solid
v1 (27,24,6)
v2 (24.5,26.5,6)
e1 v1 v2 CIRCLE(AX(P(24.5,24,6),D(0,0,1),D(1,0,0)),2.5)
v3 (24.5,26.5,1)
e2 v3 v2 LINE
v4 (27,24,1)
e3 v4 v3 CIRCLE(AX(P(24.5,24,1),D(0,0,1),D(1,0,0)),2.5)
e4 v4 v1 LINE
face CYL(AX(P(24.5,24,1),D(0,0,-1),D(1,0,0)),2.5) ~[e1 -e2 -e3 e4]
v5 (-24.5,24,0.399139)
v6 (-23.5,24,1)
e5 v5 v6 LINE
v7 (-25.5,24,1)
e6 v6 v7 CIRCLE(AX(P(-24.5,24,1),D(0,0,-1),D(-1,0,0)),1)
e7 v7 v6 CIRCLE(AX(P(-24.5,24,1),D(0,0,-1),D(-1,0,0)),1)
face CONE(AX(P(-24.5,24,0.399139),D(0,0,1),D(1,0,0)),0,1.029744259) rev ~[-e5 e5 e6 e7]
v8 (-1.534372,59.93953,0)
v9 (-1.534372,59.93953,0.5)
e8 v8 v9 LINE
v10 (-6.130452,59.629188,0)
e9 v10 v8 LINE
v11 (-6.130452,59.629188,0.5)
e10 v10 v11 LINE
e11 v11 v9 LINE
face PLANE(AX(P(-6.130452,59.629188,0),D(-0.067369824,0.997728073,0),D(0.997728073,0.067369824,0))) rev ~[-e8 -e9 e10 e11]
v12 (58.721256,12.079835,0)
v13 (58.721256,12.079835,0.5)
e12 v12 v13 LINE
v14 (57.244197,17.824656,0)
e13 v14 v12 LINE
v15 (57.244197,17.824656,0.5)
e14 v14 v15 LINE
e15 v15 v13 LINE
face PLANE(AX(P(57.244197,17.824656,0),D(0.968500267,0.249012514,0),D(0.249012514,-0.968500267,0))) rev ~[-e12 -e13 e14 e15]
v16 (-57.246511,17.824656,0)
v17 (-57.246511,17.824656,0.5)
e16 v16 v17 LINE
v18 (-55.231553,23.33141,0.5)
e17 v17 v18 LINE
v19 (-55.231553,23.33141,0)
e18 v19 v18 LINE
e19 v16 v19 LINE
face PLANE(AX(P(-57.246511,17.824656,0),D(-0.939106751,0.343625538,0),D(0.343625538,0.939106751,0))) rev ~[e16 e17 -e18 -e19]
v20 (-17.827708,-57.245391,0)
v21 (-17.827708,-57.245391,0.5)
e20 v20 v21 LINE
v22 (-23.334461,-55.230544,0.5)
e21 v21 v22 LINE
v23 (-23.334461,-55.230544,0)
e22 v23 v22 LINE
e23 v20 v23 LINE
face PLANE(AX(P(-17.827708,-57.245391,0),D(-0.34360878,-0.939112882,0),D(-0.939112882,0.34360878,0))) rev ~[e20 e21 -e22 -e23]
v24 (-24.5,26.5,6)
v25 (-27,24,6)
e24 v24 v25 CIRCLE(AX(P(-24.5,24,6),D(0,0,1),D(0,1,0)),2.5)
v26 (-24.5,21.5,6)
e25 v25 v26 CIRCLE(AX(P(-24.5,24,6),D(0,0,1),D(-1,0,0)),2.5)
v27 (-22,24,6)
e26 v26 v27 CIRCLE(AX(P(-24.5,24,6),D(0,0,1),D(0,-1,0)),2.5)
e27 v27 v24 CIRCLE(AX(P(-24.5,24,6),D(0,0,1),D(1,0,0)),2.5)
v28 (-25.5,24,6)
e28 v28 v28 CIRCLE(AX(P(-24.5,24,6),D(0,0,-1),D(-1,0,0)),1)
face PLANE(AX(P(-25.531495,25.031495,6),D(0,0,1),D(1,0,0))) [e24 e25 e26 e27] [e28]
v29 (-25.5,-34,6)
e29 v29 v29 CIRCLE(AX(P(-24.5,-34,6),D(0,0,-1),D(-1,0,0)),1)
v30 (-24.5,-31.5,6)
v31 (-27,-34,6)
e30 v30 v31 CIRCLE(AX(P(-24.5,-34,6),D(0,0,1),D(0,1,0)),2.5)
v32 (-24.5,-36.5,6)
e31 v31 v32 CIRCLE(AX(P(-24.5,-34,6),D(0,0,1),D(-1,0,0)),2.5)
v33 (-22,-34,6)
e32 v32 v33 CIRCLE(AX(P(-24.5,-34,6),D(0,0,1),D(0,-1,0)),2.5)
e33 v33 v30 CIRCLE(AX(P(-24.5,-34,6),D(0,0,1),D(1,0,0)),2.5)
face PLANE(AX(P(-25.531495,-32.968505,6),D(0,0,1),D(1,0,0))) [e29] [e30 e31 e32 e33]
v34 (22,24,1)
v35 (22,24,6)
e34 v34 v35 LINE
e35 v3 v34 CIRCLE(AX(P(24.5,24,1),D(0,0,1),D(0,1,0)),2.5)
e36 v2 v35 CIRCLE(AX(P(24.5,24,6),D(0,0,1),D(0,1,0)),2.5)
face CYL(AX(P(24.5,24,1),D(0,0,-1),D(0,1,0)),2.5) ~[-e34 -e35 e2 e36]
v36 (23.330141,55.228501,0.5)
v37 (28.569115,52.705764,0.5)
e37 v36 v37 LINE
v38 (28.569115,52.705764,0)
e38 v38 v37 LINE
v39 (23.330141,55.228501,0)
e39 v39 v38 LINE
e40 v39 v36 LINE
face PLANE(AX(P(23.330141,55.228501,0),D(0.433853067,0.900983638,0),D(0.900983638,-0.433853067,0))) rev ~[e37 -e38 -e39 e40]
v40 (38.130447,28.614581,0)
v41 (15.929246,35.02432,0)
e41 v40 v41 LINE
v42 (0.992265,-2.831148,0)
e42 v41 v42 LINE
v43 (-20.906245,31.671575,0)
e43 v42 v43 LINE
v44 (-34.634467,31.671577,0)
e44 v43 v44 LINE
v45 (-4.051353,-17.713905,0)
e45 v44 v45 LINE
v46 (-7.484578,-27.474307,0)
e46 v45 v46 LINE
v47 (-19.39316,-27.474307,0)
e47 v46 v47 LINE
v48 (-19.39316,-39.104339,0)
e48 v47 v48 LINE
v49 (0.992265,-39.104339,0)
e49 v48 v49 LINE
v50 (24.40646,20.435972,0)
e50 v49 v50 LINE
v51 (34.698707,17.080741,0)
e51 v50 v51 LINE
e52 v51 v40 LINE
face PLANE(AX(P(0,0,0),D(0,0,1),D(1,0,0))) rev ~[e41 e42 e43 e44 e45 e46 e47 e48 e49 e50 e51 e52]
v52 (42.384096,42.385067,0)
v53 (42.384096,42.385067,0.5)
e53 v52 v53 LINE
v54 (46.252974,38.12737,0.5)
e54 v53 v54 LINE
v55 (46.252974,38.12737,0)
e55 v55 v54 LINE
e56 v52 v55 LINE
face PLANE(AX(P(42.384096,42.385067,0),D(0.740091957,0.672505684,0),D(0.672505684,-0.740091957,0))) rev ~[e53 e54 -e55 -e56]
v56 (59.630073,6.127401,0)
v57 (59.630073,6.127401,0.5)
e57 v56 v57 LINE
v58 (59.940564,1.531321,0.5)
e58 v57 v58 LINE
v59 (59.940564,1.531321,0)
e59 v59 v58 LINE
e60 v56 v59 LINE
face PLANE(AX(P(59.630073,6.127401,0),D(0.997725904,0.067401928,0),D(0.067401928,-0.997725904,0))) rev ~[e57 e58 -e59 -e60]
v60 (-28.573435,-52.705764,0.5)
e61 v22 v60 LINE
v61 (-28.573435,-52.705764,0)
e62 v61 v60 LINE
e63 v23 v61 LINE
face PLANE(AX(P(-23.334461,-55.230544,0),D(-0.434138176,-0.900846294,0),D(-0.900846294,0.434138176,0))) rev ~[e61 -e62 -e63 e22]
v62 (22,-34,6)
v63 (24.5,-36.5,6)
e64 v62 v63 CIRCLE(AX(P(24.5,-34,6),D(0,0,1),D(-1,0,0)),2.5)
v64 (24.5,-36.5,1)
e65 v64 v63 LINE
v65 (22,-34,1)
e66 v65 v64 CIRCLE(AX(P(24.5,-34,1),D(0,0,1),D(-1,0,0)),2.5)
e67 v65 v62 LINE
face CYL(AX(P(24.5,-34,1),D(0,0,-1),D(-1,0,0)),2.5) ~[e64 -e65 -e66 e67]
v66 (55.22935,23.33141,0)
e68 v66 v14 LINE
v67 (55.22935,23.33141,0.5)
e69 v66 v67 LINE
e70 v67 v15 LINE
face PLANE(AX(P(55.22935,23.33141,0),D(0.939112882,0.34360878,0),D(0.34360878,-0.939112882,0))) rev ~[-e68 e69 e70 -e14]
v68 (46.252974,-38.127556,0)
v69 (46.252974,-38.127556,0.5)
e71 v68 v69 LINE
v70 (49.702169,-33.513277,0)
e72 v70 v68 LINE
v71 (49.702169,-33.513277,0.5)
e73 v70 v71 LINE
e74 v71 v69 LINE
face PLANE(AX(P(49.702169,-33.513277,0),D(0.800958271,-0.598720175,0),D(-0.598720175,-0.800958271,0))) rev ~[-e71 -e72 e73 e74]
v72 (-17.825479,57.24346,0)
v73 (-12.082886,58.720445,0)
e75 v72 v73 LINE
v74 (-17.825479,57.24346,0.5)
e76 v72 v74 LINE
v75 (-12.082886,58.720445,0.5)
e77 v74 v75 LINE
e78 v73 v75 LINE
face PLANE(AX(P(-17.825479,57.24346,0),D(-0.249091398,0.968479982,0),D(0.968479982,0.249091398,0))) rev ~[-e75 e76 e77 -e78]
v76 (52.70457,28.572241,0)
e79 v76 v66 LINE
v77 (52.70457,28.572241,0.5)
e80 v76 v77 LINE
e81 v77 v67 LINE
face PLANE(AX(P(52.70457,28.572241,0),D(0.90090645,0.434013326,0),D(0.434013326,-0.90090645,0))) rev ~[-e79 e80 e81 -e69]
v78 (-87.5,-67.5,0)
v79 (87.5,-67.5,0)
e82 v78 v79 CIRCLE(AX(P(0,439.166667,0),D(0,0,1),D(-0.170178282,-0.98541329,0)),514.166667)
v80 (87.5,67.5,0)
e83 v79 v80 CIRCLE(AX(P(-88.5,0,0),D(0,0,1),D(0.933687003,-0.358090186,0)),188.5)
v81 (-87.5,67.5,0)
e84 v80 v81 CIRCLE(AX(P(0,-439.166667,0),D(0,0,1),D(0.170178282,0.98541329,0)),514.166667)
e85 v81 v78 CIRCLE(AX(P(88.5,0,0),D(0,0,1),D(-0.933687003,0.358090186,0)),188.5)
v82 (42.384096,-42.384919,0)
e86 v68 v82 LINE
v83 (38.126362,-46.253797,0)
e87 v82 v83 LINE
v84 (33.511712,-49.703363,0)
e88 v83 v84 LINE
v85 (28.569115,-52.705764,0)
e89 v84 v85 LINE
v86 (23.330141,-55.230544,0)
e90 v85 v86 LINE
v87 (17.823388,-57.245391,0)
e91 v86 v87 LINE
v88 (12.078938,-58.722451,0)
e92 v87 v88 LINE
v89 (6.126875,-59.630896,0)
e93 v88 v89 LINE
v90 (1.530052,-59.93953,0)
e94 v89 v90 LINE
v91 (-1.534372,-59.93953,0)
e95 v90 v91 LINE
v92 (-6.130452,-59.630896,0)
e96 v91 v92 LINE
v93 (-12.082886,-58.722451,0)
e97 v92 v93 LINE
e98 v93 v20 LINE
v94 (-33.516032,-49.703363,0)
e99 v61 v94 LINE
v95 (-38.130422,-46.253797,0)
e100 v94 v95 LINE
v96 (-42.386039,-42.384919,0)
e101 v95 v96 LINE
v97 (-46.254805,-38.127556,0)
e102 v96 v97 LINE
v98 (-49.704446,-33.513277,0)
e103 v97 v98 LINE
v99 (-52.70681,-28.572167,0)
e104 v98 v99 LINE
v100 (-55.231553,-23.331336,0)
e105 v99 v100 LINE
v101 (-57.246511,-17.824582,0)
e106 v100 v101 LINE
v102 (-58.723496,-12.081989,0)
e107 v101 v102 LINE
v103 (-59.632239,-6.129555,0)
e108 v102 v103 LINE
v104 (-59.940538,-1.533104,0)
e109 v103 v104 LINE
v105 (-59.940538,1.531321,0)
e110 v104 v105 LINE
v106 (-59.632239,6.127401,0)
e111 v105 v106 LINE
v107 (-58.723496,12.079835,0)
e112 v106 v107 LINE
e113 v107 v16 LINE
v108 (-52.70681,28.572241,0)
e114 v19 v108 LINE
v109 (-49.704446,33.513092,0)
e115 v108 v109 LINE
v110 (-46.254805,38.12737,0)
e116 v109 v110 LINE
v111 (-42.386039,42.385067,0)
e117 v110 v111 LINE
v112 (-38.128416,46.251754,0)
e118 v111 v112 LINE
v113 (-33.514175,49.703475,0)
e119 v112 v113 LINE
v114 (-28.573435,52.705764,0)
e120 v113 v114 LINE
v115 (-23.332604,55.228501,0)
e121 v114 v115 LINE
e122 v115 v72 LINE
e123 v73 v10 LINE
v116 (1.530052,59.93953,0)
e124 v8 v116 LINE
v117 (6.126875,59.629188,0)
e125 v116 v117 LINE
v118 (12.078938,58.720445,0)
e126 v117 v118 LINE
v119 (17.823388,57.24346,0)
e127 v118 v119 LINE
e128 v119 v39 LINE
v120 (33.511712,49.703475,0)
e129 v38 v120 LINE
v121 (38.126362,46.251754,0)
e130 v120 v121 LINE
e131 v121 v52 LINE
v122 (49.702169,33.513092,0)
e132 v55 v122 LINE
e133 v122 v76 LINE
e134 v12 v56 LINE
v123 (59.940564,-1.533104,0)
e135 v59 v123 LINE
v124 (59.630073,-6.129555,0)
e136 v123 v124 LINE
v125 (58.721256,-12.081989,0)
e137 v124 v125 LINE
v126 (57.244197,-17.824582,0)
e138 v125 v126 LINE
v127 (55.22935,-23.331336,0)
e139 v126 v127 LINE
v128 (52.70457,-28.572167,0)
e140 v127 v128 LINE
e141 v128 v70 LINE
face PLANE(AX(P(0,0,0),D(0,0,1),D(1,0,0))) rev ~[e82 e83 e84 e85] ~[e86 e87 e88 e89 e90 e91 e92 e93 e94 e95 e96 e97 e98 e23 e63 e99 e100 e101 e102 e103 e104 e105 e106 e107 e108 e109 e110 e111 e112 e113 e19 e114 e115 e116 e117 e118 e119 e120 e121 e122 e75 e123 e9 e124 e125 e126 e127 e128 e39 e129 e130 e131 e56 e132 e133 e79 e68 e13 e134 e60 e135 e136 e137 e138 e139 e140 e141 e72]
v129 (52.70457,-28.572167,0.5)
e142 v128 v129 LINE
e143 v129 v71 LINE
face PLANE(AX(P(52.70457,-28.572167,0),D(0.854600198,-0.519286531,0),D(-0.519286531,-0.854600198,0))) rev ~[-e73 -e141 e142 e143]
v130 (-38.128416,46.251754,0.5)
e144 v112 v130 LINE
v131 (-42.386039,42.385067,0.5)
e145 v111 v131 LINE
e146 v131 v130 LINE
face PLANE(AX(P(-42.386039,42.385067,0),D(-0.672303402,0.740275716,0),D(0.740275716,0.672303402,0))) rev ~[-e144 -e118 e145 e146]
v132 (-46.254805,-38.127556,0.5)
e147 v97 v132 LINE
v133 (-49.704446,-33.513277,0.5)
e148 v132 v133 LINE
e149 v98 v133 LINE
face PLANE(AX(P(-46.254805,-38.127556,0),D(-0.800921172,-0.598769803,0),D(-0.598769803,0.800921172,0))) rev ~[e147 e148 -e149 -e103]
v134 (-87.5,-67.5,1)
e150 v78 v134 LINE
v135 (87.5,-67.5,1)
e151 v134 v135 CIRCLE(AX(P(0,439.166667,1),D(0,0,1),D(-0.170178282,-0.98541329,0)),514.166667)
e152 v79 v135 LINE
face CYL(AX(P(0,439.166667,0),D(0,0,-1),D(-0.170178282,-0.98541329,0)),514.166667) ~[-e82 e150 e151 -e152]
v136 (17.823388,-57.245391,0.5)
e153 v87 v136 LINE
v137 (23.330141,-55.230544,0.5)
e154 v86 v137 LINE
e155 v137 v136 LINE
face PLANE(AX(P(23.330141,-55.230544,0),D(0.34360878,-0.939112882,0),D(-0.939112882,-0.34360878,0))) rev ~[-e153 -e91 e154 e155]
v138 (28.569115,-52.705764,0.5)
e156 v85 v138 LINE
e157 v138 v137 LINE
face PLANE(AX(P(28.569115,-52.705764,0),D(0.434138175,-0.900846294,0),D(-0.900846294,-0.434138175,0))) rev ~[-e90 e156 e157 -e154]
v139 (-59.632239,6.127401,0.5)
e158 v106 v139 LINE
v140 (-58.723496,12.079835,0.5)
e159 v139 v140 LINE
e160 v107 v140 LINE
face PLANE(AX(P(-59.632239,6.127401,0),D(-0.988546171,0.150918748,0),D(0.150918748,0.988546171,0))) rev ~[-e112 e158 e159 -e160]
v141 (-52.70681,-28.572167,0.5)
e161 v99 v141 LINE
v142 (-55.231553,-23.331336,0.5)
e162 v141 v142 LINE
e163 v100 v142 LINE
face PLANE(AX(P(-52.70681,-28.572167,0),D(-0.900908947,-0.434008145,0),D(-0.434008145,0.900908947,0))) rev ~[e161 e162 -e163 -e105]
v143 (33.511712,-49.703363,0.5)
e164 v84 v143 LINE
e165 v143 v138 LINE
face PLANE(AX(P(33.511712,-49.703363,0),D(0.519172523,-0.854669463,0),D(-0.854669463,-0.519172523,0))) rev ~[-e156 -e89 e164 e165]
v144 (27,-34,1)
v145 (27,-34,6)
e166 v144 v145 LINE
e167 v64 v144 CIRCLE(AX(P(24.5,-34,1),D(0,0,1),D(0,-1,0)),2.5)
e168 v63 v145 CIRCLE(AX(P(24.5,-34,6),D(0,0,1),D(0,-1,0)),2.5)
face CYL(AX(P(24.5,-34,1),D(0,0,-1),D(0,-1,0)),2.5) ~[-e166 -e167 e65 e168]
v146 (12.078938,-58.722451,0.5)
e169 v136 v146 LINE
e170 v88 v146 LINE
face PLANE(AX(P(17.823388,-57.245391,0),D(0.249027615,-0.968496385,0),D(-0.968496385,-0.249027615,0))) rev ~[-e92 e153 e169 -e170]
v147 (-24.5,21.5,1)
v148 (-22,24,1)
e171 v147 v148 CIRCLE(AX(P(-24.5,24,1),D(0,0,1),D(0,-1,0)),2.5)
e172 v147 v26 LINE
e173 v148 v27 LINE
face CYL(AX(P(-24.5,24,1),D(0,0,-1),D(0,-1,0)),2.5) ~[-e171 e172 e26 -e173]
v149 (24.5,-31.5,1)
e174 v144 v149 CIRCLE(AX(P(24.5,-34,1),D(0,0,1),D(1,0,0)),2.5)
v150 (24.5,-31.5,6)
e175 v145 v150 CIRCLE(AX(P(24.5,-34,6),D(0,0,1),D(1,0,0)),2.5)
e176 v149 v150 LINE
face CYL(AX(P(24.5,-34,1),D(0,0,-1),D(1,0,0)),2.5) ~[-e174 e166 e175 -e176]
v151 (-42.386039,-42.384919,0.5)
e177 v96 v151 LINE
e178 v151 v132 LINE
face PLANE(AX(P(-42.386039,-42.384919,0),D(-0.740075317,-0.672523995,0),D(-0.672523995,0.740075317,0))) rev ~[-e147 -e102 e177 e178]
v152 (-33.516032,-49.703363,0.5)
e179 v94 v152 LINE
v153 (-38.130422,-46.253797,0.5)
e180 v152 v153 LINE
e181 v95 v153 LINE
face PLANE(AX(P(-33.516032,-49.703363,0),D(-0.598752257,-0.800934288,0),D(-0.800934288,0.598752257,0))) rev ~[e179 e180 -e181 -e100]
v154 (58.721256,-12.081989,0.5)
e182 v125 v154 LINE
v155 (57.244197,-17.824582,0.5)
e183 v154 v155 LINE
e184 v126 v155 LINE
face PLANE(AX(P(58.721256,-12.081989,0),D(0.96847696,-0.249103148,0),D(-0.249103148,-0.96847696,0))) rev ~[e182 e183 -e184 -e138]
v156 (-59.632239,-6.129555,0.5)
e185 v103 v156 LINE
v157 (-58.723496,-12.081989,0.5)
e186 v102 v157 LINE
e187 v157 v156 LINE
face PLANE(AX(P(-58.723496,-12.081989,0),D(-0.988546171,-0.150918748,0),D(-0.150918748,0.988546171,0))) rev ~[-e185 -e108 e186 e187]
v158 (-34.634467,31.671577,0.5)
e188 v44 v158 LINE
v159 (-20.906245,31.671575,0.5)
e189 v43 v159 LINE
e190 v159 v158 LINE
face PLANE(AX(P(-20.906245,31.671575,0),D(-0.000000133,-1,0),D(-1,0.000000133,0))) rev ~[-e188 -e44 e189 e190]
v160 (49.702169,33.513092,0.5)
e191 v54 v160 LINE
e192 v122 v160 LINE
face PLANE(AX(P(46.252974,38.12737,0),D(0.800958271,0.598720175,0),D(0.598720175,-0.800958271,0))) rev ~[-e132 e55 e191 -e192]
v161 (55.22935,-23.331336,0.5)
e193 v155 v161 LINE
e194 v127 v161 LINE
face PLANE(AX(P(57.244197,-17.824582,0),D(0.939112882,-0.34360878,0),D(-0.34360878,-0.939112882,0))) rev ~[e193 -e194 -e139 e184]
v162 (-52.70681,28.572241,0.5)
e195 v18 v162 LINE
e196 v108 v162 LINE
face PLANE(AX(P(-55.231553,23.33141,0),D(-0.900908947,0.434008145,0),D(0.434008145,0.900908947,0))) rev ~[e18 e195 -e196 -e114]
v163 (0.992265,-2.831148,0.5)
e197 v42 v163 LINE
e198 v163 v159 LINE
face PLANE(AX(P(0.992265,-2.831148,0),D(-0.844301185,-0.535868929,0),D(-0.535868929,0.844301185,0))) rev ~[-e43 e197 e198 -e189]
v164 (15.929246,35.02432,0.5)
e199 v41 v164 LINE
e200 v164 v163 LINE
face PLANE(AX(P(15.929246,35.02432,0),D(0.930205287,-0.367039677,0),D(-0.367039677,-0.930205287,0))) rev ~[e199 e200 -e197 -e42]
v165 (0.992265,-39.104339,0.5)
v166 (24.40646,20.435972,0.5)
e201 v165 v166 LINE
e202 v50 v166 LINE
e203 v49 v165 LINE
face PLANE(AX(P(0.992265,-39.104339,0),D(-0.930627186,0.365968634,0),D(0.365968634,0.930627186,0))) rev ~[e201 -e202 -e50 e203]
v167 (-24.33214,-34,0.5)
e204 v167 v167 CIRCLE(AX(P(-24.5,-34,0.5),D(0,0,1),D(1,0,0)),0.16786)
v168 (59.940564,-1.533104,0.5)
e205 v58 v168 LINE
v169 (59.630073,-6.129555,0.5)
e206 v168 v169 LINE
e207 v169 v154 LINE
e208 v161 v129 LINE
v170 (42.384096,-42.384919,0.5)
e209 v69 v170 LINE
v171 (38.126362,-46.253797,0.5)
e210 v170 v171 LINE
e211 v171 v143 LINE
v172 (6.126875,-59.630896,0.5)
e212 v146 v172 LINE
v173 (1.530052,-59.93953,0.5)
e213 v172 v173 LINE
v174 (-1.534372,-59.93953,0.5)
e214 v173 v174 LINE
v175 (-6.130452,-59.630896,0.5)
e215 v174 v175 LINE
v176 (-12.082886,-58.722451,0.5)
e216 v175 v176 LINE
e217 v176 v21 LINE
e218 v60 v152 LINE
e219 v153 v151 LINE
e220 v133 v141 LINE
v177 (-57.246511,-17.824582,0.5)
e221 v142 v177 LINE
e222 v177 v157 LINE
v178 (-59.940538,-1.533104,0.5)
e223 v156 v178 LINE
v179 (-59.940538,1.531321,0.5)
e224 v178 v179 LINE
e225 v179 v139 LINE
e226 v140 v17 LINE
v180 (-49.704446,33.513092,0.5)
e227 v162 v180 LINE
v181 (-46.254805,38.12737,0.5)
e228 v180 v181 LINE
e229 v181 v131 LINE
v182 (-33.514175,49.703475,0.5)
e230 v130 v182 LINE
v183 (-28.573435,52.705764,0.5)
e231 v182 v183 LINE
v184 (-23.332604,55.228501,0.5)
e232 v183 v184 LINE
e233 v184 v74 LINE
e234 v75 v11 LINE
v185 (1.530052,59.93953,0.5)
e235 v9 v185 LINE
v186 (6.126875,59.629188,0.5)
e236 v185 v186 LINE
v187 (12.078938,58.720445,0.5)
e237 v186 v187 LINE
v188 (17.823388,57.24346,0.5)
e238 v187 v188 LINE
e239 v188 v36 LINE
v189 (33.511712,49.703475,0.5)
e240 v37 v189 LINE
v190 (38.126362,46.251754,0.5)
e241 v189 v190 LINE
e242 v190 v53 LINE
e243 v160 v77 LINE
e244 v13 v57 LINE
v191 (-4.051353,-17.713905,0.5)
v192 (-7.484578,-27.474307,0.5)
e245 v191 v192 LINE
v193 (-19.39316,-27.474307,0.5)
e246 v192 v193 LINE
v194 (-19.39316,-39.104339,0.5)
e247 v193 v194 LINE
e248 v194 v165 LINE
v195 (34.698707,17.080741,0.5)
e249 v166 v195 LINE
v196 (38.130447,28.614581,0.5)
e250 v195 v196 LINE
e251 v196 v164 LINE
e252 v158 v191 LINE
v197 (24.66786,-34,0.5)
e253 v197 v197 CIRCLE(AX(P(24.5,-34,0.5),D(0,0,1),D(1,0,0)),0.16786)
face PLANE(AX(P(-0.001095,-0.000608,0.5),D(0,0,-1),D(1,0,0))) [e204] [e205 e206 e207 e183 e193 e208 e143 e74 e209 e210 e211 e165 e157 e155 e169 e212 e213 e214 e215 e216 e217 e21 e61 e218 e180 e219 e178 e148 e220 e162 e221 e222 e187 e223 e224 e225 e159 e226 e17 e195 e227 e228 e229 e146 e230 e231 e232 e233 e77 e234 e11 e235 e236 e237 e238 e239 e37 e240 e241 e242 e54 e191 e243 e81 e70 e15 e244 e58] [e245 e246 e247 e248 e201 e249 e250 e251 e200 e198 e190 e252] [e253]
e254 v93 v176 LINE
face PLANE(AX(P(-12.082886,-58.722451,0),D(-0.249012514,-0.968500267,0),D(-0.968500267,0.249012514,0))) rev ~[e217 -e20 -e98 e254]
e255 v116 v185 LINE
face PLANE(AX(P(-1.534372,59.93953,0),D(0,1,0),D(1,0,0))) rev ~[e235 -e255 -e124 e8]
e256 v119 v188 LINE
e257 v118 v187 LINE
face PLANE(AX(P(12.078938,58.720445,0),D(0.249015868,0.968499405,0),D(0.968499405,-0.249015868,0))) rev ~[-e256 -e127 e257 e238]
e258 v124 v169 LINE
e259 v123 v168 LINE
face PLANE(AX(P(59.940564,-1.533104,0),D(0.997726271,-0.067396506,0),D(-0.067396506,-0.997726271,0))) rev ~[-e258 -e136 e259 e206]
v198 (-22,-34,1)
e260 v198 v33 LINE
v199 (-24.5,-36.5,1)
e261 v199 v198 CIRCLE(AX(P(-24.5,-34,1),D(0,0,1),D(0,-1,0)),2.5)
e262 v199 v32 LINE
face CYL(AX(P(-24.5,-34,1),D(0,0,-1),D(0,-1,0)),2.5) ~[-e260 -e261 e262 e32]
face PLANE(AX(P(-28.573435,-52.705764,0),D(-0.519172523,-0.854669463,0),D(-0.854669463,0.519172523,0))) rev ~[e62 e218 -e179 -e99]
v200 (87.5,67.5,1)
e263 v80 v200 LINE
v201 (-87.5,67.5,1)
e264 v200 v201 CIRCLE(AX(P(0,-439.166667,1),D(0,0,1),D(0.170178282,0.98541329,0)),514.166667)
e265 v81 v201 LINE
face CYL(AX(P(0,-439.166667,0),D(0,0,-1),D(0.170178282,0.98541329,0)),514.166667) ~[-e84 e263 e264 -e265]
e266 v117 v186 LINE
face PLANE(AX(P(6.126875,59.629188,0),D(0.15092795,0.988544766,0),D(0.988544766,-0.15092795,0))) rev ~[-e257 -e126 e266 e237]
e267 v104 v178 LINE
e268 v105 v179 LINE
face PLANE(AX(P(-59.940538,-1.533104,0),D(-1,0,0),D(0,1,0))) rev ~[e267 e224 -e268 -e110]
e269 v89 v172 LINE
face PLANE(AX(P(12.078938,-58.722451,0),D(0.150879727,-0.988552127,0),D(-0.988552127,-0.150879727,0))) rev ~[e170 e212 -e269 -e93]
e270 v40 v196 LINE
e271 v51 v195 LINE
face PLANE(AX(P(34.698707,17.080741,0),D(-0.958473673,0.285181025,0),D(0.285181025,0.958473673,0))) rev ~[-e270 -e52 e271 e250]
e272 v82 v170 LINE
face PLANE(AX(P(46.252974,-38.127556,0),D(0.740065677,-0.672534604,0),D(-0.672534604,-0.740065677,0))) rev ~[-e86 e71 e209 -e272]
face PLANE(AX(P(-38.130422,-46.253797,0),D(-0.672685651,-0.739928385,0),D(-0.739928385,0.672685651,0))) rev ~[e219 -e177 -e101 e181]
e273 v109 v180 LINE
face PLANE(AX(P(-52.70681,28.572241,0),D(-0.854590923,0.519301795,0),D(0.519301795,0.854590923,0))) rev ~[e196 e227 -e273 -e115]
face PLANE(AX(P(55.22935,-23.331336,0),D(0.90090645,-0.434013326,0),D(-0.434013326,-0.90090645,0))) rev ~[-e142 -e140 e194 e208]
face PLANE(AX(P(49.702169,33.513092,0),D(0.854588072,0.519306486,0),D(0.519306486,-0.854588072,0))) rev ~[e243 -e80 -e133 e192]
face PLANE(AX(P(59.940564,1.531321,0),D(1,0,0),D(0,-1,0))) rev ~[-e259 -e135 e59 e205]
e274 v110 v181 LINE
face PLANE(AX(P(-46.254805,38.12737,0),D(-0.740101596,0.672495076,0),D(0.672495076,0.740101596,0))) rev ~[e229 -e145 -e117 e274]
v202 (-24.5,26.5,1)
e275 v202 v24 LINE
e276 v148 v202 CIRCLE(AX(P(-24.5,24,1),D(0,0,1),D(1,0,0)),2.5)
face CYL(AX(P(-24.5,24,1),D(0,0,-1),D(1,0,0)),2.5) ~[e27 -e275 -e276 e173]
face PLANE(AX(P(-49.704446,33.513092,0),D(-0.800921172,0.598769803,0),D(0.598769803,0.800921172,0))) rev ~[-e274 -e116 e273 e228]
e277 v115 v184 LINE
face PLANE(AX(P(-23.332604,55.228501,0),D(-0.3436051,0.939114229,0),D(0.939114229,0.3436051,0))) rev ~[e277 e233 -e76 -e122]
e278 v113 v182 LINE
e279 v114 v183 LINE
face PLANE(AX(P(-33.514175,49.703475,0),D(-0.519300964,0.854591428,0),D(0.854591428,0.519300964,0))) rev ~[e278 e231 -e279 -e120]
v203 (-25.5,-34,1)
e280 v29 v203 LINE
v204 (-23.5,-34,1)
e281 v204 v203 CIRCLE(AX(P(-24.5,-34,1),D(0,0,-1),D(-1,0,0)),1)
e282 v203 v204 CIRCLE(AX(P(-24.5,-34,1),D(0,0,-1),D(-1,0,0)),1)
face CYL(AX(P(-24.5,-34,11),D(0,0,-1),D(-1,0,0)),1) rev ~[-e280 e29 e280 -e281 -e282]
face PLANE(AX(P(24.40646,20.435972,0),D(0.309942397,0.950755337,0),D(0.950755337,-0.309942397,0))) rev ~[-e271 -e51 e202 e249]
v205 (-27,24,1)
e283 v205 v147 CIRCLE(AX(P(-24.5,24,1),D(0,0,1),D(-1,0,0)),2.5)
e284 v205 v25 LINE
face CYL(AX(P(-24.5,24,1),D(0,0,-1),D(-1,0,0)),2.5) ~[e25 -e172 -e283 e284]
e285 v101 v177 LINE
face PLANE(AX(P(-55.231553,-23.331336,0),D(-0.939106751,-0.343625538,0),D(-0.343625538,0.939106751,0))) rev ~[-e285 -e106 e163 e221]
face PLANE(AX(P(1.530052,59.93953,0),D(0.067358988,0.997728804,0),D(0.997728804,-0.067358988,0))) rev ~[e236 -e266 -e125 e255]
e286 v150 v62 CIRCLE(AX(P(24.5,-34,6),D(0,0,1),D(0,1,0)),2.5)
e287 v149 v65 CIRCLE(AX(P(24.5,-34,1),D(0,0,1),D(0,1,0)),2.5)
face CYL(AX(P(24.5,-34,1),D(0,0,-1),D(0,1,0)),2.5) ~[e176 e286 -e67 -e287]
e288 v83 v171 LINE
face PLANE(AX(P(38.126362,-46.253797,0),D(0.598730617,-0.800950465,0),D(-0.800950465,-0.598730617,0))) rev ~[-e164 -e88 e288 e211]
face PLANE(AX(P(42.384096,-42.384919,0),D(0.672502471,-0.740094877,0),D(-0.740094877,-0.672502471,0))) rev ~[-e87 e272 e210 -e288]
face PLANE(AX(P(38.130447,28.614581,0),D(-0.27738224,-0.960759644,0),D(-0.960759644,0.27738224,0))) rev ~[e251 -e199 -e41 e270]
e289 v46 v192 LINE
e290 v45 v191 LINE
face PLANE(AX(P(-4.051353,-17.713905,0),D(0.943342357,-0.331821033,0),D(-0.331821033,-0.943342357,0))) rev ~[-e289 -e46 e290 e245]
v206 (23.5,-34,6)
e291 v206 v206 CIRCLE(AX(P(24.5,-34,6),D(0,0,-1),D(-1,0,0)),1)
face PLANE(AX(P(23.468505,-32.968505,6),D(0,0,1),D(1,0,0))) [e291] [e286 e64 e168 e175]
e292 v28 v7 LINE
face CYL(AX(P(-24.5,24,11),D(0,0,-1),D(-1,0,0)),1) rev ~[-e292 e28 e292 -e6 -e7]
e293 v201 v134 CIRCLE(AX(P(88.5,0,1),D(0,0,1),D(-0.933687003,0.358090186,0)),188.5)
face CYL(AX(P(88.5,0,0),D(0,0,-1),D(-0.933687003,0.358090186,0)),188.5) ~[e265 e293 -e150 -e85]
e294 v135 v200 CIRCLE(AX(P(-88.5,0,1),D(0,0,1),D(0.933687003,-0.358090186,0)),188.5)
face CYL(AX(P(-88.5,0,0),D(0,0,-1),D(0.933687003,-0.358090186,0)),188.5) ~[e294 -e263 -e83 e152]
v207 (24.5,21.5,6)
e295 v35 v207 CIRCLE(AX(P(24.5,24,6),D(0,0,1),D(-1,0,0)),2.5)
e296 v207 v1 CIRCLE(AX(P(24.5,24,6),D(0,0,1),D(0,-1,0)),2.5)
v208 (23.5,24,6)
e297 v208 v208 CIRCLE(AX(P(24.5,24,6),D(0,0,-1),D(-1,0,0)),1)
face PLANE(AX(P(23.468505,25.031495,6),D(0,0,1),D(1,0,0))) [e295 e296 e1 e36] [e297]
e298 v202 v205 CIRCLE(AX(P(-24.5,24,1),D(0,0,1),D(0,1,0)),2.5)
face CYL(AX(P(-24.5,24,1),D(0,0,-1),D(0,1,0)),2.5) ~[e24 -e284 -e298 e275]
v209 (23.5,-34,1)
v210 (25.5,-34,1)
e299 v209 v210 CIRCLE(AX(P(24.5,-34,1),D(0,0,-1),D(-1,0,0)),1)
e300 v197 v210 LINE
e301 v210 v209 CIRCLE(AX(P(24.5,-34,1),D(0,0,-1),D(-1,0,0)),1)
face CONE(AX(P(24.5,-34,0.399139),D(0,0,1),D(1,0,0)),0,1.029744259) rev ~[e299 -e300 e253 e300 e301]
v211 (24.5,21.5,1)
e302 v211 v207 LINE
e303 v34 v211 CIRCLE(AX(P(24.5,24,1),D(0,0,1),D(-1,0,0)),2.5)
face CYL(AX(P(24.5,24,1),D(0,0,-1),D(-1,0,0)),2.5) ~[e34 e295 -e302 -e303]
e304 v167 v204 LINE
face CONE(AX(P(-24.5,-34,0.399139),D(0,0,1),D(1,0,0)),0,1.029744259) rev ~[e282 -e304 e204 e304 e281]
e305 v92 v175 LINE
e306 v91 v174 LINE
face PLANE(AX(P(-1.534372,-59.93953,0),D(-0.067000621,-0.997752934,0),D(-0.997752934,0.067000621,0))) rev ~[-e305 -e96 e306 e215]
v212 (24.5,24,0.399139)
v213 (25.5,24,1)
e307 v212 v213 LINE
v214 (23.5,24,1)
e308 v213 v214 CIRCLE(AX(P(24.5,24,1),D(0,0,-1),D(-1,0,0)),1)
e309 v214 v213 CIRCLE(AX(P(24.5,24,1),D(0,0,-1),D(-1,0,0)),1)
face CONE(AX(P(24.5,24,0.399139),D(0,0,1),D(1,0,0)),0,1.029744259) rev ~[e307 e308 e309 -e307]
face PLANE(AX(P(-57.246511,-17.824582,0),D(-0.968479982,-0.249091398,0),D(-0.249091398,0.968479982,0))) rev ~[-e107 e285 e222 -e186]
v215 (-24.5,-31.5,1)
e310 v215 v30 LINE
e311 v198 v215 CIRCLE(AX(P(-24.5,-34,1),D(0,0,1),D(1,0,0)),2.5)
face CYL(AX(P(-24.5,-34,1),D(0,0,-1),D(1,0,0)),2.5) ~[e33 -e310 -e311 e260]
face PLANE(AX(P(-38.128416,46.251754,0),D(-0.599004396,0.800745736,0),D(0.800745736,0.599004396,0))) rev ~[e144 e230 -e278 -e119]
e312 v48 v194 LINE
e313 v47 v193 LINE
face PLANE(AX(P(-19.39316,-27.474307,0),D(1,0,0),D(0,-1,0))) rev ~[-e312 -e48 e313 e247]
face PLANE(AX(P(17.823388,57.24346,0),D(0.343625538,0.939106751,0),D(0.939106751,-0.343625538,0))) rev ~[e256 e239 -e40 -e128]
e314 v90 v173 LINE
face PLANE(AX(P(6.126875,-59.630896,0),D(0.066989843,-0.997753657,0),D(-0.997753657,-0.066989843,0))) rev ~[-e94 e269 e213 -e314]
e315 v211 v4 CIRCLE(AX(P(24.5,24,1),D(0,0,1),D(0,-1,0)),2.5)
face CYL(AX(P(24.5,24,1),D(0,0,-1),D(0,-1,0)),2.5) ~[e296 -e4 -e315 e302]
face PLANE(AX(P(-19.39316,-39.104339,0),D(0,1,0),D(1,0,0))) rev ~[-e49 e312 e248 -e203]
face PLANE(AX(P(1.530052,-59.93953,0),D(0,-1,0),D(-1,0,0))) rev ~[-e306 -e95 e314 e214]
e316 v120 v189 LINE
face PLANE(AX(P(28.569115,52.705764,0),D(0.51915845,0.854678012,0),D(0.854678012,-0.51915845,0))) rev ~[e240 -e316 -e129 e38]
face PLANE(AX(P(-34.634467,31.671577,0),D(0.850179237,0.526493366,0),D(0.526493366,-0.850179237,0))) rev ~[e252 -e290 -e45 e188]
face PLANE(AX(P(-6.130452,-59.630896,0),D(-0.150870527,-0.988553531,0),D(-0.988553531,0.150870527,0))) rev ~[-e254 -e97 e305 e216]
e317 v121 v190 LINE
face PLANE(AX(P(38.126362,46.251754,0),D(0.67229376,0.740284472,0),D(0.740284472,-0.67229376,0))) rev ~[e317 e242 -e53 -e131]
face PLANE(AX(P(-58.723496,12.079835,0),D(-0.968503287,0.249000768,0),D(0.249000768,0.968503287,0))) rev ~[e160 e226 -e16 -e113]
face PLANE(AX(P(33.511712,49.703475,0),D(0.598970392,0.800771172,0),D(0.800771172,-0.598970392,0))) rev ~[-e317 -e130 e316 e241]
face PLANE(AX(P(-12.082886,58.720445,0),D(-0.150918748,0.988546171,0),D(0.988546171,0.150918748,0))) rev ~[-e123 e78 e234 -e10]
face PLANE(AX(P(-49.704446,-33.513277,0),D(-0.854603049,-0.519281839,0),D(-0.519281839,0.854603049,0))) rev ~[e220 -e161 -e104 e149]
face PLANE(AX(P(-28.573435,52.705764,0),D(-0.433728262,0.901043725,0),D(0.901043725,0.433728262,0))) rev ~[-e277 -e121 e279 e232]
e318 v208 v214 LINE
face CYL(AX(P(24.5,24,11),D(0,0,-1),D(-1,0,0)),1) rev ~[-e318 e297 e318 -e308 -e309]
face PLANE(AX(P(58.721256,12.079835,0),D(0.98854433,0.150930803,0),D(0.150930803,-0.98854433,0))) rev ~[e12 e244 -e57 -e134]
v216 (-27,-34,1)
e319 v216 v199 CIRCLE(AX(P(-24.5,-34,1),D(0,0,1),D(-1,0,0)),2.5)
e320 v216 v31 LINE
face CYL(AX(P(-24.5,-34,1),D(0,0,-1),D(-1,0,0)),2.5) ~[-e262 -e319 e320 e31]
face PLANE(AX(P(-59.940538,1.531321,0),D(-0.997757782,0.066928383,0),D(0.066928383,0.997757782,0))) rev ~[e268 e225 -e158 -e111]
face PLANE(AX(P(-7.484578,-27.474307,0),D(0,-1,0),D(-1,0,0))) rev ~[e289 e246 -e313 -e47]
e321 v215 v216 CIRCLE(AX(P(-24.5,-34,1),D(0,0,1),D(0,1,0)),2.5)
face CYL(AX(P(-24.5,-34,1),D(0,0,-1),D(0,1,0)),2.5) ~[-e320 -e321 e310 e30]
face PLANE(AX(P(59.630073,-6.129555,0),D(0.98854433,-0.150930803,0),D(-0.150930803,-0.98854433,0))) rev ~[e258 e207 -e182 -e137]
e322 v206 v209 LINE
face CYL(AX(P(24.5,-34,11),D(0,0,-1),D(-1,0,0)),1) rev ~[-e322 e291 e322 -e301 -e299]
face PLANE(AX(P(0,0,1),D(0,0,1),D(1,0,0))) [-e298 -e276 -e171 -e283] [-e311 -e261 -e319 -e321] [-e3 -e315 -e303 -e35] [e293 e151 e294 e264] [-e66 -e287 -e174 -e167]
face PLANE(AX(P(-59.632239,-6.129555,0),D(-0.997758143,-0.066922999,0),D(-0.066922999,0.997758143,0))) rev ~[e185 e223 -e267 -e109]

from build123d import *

# Parameters (mm, degrees)
F1_DEPTH        = 1
F3_DEPTH        = 0.5
F5_DEPTH        = 5
F10_D           = 2
F10_DEPTH       = 5
F10_TIP         = 0.600860619
F10_ON_F7_D     = 2
F10_ON_F7_DEPTH = 5
F10_ON_F7_TIP   = 0.600860619
F10_ON_F8_D     = 2
F10_ON_F8_DEPTH = 5
F10_ON_F8_TIP   = 0.600860619
F10_ON_F9_D     = 2
F10_ON_F9_DEPTH = 5
F10_ON_F9_TIP   = 0.600860619


# Not quite as in the source:
# - ends of sketch curves that miss each other by under 0.0002 mm in the source are joined


with BuildPart() as f1:
    # F0 (on Top) → F1 (new body)
    with BuildSketch(Plane.XY):
        with BuildLine():
            ThreePointArc((87.5, -67.5), (100, 0), (87.5, 67.5))
            ThreePointArc((87.5, 67.5), (0, 75), (-87.5, 67.5))
            ThreePointArc((-87.5, 67.5), (-100, 0), (-87.5, -67.5))
            ThreePointArc((-87.5, -67.5), (0, -75), (87.5, -67.5))
        make_face()
    extrude(amount=F1_DEPTH)

    # F2 (on face) → F3 (cut)
    with BuildSketch(Plane(origin=(0, 0, 0), x_dir=(1, 0, 0), z_dir=(0, 0, -1))):
        Polygon((59.9405638027, -1.5313209672), (59.9405638027, -3.714e-05), (59.9405638027, 1.5331036891), (59.6300730728, 6.1295549733), (58.7212563071, 12.0819890983), (57.2441969375, 17.8245820004), (55.2293497966, 23.3313356518), (52.7045699138, 28.5721666207), (49.7021691234, 33.5132774711), (46.2529736583, 38.1275559743), (42.3840957472, 42.3849186981), (38.126361623, 46.2537966092), (33.5117117195, 49.7033634747), (28.5691152675, 52.705764265), (23.3301413005, 55.2305441479), (17.8233876491, 57.2453912888), (12.078937745, 58.7224506584), (6.1268750204, 59.6308960237), (1.5300523358, 59.9395297516), (-0.0008600909, 59.9395297516), (-1.5343723204, 59.9395297516), (-6.1304522042, 59.6308960237), (-12.0828863293, 58.7224506584), (-17.8277076337, 57.2453912888), (-23.3344612852, 55.2305441479), (-28.5734352521, 52.705764265), (-33.5160317041, 49.7033634747), (-38.1304216273, 46.2537966092), (-42.3860387693, 42.3849186981), (-46.2548052603, 38.1275559743), (-49.7044464059, 33.5132774711), (-52.7068100562, 28.5721666207), (-55.2315527989, 23.3313356518), (-57.24651136, 17.8245820004), (-58.7234964495, 12.0819890983), (-59.6322389351, 6.1295549733), (-59.9405384027, 1.5331036891), (-59.9405384027, -3.714e-05), (-59.9405384027, -1.5313209672), (-59.6322389351, -6.127400851), (-58.7234964495, -12.079834976), (-57.24651136, -17.8246562804), (-55.2315527989, -23.3314099319), (-52.7068100562, -28.5722409008), (-49.7044464059, -33.5130917709), (-46.2548052603, -38.1273702741), (-42.3860387693, -42.3850672583), (-38.1284160652, -46.251753907), (-33.5141747021, -49.7034748948), (-28.5734352521, -52.705764265), (-23.3326042832, -55.2285014457), (-17.8254792313, -57.2434600068), (-12.0828863293, -58.7204450962), (-6.1304522042, -59.6291875818), (-1.5343723204, -59.9395297516), (-0.0008600909, -59.9395297516), (1.5300523358, -59.9395297516), (6.1268750204, -59.6291875818), (12.078937745, -58.7204450962), (17.8233876491, -57.2434600068), (23.3301413005, -55.2285014457), (28.5691152675, -52.705764265), (33.5117117195, -49.7034748948), (38.126361623, -46.251753907), (42.3840957472, -42.3850672583), (46.2529736583, -38.1273702741), (49.7021691234, -33.5130917709), (52.7045699138, -28.5722409008), (55.2293497966, -23.3314099319), (57.2441969375, -17.8246562804), (58.7212563071, -12.079834976), (59.6300730728, -6.127400851), align=None)
        Polygon((38.1304470273, -28.6145805458), (15.9292456364, -35.0243199768), (0.9922645644, 2.8311480684), (-20.9062448628, -31.6715753619), (-34.6344668525, -31.6715771942), (-4.051352795, 17.7139046828), (-7.4845780431, 27.4743070541), (-19.3931602971, 27.4743070541), (-19.3931602971, 39.1043390122), (0.9922645644, 39.1043390122), (24.4064596442, -20.4359724552), (34.6987073808, -17.08074129), align=None, mode=Mode.SUBTRACT)
    extrude(amount=-F3_DEPTH, mode=Mode.SUBTRACT)

    # F4 (on face) → F5 (join)
    with BuildSketch(Plane.XY.offset(1)):
        with BuildLine():
            ThreePointArc((-24.5, -31.5), (-26.267766953, -32.232233047), (-27, -34))
            Line((-27, -34), (-24.5, -34))
            Line((-24.5, -34), (-24.5, -31.5))
        make_face()
        with BuildLine():
            Line((-24.5, -31.5), (-24.5, -34))
            Line((-24.5, -34), (-22, -34))
            ThreePointArc((-22, -34), (-22.732233047, -32.232233047), (-24.5, -31.5))
        make_face()
        with BuildLine():
            Line((-22, -34), (-24.5, -34))
            Line((-24.5, -34), (-24.5, -36.5))
            ThreePointArc((-24.5, -36.5), (-22.732233047, -35.767766953), (-22, -34))
        make_face()
        with BuildLine():
            Line((-24.5, -34), (-27, -34))
            ThreePointArc((-27, -34), (-26.267766953, -35.767766953), (-24.5, -36.5))
            Line((-24.5, -36.5), (-24.5, -34))
        make_face()
        with BuildLine():
            Line((-24.5, 24), (-24.5, 26.5))
            ThreePointArc((-24.5, 26.5), (-26.267766953, 25.767766953), (-27, 24))
            Line((-27, 24), (-24.5, 24))
        make_face()
        with BuildLine():
            Line((-24.5, 24), (-27, 24))
            ThreePointArc((-27, 24), (-26.267766953, 22.232233047), (-24.5, 21.5))
            Line((-24.5, 21.5), (-24.5, 24))
        make_face()
        with BuildLine():
            ThreePointArc((-22, 24), (-22.732233047, 25.767766953), (-24.5, 26.5))
            Line((-24.5, 26.5), (-24.5, 24))
            Line((-24.5, 24), (-22, 24))
        make_face()
        with BuildLine():
            Line((-22, 24), (-24.5, 24))
            Line((-24.5, 24), (-24.5, 21.5))
            ThreePointArc((-24.5, 21.5), (-22.732233047, 22.232233047), (-22, 24))
        make_face()
        with BuildLine():
            Line((24.5, -34), (24.5, -31.5))
            ThreePointArc((24.5, -31.5), (22.732233047, -32.232233047), (22, -34))
            Line((22, -34), (24.5, -34))
        make_face()
        with BuildLine():
            ThreePointArc((22, -34), (22.732233047, -35.767766953), (24.5, -36.5))
            Line((24.5, -36.5), (24.5, -34))
            Line((24.5, -34), (22, -34))
        make_face()
        with BuildLine():
            Line((24.5, -34), (27, -34))
            ThreePointArc((27, -34), (26.267766953, -32.232233047), (24.5, -31.5))
            Line((24.5, -31.5), (24.5, -34))
        make_face()
        with BuildLine():
            ThreePointArc((24.5, -36.5), (26.267766953, -35.767766953), (27, -34))
            Line((27, -34), (24.5, -34))
            Line((24.5, -34), (24.5, -36.5))
        make_face()
        with BuildLine():
            Line((24.5, 24), (24.5, 26.5))
            ThreePointArc((24.5, 26.5), (22.732233047, 25.767766953), (22, 24))
            Line((22, 24), (24.5, 24))
        make_face()
        with BuildLine():
            ThreePointArc((27, 24), (26.267766953, 25.767766953), (24.5, 26.5))
            Line((24.5, 26.5), (24.5, 24))
            Line((24.5, 24), (27, 24))
        make_face()
        with BuildLine():
            Line((27, 24), (24.5, 24))
            Line((24.5, 24), (24.5, 21.5))
            ThreePointArc((24.5, 21.5), (26.267766953, 22.232233047), (27, 24))
        make_face()
        with BuildLine():
            Line((24.5, 21.5), (24.5, 24))
            Line((24.5, 24), (22, 24))
            ThreePointArc((22, 24), (22.732233047, 22.232233047), (24.5, 21.5))
        make_face()
    extrude(amount=F5_DEPTH)

    # F10
    with Locations(Plane.XY.offset(6)):
        with Locations((-24.5, 24)):
            Hole(F10_D / 2, depth=F10_DEPTH)
            with Locations((0, 0, -(F10_DEPTH + F10_TIP / 2))):  # 118° drill point
                Cone(0, F10_D / 2, F10_TIP, mode=Mode.SUBTRACT)

    # F10 on F7
    with Locations(Plane.XY.offset(6)):
        with Locations((24.5, 24)):
            Hole(F10_ON_F7_D / 2, depth=F10_ON_F7_DEPTH)
            with Locations((0, 0, -(F10_ON_F7_DEPTH + F10_ON_F7_TIP / 2))):  # 118° drill point
                Cone(0, F10_ON_F7_D / 2, F10_ON_F7_TIP, mode=Mode.SUBTRACT)

    # F10 on F8
    with Locations(Plane.XY.offset(6)):
        with Locations((-24.5, -34)):
            Hole(F10_ON_F8_D / 2, depth=F10_ON_F8_DEPTH)
            with Locations((0, 0, -(F10_ON_F8_DEPTH + F10_ON_F8_TIP / 2))):  # 118° drill point
                Cone(0, F10_ON_F8_D / 2, F10_ON_F8_TIP, mode=Mode.SUBTRACT)

    # F10 on F9
    with Locations(Plane.XY.offset(6)):
        with Locations((24.5, -34)):
            Hole(F10_ON_F9_D / 2, depth=F10_ON_F9_DEPTH)
            with Locations((0, 0, -(F10_ON_F9_DEPTH + F10_ON_F9_TIP / 2))):  # 118° drill point
                Cone(0, F10_ON_F9_D / 2, F10_ON_F9_TIP, mode=Mode.SUBTRACT)


solid = f1.part
